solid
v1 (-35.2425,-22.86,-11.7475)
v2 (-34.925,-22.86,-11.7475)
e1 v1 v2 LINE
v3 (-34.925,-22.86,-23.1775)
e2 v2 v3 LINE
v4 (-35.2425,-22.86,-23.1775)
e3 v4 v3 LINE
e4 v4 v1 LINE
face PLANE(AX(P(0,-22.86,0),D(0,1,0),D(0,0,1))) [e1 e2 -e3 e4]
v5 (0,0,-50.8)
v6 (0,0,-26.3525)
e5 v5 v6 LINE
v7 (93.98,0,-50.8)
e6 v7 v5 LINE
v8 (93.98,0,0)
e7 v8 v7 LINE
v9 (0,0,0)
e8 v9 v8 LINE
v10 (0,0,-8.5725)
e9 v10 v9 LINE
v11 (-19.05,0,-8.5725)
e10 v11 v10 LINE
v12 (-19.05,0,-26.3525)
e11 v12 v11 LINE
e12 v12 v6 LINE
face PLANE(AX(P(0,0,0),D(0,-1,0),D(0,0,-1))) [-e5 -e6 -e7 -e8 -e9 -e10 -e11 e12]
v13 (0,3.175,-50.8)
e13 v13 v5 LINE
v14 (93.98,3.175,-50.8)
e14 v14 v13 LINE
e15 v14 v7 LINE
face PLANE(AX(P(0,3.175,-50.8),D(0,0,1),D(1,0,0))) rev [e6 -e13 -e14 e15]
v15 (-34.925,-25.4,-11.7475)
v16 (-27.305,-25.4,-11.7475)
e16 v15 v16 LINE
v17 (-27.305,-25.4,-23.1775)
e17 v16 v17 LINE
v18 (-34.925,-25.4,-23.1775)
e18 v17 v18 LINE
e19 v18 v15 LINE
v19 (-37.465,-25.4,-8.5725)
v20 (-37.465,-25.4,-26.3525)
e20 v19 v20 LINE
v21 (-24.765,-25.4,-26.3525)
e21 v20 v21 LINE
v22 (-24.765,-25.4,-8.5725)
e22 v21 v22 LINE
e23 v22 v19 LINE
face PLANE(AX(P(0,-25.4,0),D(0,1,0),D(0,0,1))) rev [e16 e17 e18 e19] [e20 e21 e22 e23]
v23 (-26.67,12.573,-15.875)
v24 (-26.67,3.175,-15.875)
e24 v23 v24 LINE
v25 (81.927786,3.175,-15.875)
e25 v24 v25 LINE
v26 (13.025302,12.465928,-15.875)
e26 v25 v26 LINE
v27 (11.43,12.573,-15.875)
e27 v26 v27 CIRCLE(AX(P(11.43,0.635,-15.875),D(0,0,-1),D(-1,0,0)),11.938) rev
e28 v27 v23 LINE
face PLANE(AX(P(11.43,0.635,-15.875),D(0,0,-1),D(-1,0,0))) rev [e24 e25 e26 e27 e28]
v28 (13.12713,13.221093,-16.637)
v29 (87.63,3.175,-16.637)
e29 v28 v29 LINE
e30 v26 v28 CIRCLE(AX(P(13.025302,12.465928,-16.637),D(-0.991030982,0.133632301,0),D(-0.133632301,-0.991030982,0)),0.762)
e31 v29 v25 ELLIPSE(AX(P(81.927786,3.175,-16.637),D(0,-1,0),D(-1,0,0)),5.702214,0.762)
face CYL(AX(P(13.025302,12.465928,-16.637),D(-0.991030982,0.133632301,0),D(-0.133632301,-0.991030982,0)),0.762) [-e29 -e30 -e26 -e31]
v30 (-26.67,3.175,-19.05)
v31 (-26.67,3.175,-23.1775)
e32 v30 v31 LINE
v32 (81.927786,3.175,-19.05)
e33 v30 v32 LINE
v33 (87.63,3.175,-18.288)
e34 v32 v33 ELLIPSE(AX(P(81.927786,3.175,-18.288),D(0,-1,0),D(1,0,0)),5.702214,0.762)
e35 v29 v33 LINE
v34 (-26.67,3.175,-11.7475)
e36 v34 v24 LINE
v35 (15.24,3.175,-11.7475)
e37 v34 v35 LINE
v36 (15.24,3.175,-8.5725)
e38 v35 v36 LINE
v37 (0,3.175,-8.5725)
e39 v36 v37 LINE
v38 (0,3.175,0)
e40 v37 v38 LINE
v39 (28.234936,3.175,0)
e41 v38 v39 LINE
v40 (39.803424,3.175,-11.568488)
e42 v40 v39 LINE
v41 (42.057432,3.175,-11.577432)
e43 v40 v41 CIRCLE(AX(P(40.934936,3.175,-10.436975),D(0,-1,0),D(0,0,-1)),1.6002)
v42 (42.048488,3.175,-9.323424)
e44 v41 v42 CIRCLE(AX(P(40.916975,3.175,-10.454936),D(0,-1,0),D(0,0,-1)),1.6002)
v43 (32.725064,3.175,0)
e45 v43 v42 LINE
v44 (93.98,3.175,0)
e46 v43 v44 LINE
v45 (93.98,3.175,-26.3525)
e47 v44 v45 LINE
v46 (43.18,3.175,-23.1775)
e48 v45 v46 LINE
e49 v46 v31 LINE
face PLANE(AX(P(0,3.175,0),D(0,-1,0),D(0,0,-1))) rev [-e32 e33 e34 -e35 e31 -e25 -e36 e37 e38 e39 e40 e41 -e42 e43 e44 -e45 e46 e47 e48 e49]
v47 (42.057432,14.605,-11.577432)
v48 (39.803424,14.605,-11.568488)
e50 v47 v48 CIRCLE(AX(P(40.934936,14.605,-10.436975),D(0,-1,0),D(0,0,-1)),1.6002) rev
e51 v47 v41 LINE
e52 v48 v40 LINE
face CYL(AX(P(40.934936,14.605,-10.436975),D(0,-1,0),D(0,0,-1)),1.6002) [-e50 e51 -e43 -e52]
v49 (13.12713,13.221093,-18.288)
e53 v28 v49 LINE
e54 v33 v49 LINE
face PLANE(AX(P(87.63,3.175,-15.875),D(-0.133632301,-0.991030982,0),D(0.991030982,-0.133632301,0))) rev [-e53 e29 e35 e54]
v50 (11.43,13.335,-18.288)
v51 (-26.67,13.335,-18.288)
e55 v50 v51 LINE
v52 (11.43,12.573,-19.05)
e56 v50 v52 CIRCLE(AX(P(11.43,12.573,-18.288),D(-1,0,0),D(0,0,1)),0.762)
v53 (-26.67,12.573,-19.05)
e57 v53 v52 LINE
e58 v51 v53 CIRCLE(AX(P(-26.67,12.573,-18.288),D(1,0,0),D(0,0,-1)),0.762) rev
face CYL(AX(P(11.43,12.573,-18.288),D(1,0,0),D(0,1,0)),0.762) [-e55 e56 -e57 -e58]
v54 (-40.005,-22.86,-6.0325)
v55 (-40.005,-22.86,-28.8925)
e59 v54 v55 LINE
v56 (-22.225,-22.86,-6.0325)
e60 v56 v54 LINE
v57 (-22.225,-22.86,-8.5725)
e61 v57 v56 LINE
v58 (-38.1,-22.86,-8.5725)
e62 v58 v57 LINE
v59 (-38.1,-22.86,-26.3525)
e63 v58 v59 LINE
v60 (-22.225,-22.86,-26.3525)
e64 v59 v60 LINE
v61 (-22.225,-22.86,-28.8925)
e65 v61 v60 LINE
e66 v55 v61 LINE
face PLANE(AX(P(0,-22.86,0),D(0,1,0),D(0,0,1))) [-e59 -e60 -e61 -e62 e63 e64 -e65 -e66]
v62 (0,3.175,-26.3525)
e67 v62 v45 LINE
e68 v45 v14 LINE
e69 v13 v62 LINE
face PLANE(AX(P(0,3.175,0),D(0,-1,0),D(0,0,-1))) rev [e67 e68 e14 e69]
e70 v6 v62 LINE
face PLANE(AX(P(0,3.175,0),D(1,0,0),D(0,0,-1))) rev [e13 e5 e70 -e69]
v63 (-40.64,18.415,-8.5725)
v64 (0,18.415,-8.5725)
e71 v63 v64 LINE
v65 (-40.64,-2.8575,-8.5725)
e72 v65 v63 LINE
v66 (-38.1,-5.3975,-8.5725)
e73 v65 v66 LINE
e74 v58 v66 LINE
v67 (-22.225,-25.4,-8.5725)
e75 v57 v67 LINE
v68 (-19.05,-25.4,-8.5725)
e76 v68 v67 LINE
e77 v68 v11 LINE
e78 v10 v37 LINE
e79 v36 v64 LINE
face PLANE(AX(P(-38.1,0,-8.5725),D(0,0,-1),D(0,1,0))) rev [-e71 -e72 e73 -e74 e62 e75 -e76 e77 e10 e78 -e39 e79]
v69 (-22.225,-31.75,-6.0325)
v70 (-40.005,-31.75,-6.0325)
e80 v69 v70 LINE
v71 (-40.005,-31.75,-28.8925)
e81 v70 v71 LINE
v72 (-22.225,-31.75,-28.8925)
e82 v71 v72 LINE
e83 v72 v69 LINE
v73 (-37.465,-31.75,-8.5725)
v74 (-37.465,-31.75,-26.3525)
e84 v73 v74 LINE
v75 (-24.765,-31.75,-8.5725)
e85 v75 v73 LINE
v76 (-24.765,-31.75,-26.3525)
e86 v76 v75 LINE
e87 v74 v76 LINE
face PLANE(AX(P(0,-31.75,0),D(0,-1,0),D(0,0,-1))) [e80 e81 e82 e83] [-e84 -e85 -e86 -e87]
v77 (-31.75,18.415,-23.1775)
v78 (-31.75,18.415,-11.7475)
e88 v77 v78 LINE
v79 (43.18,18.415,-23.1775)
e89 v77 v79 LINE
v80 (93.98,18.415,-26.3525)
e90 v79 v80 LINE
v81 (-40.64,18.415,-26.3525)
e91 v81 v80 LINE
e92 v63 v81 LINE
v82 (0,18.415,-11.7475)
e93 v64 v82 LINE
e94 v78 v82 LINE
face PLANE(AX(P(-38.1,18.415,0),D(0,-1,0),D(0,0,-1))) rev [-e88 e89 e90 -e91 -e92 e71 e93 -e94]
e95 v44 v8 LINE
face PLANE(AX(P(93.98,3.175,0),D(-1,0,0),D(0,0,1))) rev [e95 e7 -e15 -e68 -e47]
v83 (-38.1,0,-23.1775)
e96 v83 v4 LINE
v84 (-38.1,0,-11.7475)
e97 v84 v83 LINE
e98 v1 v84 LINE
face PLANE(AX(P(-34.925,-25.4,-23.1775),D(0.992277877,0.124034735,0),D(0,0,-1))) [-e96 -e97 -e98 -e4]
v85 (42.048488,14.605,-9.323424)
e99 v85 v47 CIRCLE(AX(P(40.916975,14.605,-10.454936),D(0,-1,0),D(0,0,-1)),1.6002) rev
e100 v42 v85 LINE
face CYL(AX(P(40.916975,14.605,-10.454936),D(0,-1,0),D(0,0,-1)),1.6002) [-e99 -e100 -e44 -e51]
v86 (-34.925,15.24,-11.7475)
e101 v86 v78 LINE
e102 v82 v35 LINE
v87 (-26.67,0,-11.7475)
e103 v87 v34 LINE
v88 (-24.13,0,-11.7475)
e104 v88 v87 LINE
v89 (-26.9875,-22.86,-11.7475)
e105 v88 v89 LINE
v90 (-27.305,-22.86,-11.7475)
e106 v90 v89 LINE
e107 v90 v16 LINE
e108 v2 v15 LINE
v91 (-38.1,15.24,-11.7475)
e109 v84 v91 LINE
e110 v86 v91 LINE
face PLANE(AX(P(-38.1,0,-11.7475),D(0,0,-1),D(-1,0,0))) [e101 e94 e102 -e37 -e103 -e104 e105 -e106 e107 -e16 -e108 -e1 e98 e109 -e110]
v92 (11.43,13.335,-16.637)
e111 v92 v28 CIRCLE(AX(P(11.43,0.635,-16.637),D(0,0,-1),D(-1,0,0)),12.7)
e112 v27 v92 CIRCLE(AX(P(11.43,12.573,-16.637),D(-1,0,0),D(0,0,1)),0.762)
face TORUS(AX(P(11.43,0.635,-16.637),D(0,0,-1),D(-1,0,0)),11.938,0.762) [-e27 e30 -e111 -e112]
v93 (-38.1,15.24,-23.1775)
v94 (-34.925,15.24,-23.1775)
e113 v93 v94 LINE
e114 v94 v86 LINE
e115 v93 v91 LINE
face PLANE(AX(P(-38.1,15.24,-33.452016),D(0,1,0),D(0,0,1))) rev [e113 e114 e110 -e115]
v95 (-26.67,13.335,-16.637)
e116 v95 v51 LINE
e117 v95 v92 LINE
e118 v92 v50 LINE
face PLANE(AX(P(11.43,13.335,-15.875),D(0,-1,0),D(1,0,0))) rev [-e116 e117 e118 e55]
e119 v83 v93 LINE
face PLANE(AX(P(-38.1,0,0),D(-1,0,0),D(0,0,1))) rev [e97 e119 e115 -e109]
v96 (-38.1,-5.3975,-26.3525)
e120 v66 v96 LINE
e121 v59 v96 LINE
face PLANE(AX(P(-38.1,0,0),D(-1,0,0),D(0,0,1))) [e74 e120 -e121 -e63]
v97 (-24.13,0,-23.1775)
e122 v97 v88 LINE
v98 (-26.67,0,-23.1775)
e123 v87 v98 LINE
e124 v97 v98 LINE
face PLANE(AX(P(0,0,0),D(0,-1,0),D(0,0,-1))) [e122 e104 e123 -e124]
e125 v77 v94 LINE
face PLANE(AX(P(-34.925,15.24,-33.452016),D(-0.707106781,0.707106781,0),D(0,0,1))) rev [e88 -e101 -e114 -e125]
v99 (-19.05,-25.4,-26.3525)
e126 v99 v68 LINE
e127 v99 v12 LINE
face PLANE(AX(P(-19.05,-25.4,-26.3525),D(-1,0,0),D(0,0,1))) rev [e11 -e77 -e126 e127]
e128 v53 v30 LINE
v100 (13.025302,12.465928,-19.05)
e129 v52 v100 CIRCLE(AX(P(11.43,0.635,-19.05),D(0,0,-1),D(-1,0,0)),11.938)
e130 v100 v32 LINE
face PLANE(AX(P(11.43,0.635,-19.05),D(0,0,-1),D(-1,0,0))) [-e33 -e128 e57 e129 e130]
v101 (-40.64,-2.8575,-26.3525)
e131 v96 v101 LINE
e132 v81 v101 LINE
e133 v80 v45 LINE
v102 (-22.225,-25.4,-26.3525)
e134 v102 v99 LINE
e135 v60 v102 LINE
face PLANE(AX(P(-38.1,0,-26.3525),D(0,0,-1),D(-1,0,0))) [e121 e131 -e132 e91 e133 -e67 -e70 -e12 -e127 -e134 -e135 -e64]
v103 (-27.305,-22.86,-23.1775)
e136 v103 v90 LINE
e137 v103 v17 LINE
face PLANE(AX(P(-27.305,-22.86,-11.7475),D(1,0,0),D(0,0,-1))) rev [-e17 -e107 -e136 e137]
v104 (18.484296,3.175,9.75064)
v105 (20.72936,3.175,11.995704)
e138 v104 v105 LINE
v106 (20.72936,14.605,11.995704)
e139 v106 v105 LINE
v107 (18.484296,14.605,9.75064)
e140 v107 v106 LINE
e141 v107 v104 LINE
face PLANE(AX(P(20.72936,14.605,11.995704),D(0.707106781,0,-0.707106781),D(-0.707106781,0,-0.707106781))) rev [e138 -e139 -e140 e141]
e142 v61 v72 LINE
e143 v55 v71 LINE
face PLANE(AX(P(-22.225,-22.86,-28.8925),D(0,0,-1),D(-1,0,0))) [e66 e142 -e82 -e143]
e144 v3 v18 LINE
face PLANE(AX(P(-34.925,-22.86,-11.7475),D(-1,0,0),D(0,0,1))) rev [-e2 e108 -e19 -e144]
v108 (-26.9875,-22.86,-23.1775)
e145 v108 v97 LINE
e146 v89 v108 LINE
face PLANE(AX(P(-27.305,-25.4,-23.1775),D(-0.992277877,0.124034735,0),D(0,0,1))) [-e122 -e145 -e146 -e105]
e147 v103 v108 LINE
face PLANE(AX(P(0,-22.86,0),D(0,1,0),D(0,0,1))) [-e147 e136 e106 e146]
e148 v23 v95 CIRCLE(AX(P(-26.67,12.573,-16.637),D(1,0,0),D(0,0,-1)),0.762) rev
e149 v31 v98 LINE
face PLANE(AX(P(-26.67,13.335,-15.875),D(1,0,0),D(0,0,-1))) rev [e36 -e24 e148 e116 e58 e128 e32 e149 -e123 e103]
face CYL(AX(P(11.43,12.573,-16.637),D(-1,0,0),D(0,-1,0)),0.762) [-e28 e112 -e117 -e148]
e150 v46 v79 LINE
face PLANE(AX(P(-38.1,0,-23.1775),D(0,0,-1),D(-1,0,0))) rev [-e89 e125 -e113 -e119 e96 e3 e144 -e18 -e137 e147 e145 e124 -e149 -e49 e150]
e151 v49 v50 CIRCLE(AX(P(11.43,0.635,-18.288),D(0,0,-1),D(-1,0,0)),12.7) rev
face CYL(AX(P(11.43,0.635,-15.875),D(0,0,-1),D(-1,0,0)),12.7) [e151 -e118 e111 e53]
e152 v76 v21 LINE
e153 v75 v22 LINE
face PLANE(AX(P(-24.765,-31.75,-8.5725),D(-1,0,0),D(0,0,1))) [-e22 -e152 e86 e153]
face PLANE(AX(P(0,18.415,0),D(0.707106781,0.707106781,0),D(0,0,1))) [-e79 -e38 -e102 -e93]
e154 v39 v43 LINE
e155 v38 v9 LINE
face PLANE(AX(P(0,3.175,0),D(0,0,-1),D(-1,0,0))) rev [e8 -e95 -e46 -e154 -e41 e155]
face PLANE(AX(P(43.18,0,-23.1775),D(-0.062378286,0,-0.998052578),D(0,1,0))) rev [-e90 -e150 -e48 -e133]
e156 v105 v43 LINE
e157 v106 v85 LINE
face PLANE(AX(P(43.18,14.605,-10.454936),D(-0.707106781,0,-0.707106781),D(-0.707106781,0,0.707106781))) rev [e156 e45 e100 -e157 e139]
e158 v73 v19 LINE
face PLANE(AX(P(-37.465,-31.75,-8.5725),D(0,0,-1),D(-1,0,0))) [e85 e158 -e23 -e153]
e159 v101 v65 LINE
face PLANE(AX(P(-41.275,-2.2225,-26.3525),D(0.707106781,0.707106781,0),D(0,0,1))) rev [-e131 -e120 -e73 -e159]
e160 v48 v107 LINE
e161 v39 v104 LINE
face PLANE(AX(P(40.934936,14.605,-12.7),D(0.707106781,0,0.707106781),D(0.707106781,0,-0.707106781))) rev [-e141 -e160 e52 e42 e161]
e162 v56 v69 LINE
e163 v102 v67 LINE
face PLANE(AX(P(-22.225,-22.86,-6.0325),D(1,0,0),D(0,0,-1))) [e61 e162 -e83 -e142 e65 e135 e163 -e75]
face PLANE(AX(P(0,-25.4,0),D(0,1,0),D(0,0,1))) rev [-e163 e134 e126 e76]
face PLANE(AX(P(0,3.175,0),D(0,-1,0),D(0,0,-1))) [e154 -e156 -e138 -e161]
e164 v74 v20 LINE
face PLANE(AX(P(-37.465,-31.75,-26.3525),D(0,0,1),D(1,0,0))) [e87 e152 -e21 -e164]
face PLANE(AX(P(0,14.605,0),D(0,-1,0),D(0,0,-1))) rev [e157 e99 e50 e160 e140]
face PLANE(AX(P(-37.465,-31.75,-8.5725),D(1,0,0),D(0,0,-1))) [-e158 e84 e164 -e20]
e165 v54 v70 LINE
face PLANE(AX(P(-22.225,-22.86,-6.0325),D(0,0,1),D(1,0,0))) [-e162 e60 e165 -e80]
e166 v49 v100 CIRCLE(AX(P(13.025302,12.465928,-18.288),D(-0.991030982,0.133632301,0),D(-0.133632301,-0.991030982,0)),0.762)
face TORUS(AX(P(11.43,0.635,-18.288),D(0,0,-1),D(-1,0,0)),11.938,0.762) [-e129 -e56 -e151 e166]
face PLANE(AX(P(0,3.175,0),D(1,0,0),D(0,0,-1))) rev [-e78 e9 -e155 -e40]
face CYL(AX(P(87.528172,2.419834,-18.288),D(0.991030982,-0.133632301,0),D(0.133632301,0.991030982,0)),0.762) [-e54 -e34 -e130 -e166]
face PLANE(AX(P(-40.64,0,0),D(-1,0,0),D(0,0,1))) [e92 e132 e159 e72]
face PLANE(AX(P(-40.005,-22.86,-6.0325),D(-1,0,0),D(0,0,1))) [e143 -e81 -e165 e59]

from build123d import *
from OCP.BRepFilletAPI import BRepFilletAPI_MakeChamfer

# Parameters (mm, degrees)
SKETCH1_W            = 93.98
SKETCH1_H            = 50.8
BOSS_EXTRUDE1_DEPTH  = 3.175
BOSS_EXTRUDE2_DEPTH  = 3.175
FILLET1_R            = 0.762
BOSS_EXTRUDE3_DEPTH  = 11.43
FILLET2_R            = 1.6002
SKETCH4_W            = 3.175
SKETCH4_H            = 15.24
SKETCH4_H_2          = 3.175
BOSS_EXTRUDE4_DEPTH  = 38.1
CHAMFER1_SIZE        = 15.24
SKETCH8_W            = 19.05
SKETCH8_H            = 17.78
BOSS_EXTRUDE5_DEPTH  = 25.4
SKETCH9_W            = 7.62
SKETCH9_H            = 11.43
CUT_EXTRUDE3_DEPTH   = 110.809108912
CHAMFER2_SIZE        = 3.175
CHAMFER2_SIZE_2      = 25.4
SKETCH14_W           = 17.78
SKETCH14_H           = 22.86
SKETCH14_W_2         = 7.62
SKETCH14_H_2         = 11.43
BOSS_EXTRUDE11_DEPTH = 2.54
SKETCH10_W           = 17.78
SKETCH10_H           = 22.86
SKETCH10_W_2         = 12.7
SKETCH10_H_2         = 17.78
BOSS_EXTRUDE12_DEPTH = 6.35
SKETCH11_W           = 6.35
SKETCH11_H           = 3.175
BOSS_EXTRUDE7_DEPTH  = 14.605
CHAMFER3_SIZE        = 3.175
SKETCH13_W           = 17.78
SKETCH13_H           = 20.6375
BOSS_EXTRUDE8_DEPTH  = 2.54
CHAMFER4_SIZE        = 3.175
SKETCH15_W           = 93.98
SKETCH15_H           = 15.24
BOSS_EXTRUDE13_DEPTH = 3.175
CHAMFER5_SIZE        = 3.175
CHAMFER5_SIZE_2      = 50.8
SKETCH17_W           = 26.67
SKETCH17_H           = 14.605
BOSS_EXTRUDE14_DEPTH = 3.175


# Some blends are built 0.0001 mm under size
with BuildPart() as part:
    # Sketch1 → Boss-Extrude1 (new body)
    with BuildSketch(Plane(origin=(0, 0, 0), x_dir=(1, 0, 0), z_dir=(0, 1, 0))):
        with Locations((46.99, 25.4)):
            Rectangle(SKETCH1_W, SKETCH1_H)
    extrude(amount=BOSS_EXTRUDE1_DEPTH)

    # Sketch2 → Boss-Extrude2 (add)
    with BuildSketch(Plane.XY.offset(-19.05)):
        with BuildLine():
            Line((87.63, 3.175), (13.127130217, 13.221093478))
            ThreePointArc((13.127130217, 13.221093478), (12.280474231, 13.306491372), (11.43, 13.335))
            Line((11.43, 13.335), (-26.67, 13.335))
            Line((-26.67, 13.335), (-26.67, 3.175))
            Line((-26.67, 3.175), (87.63, 3.175))
        make_face()
    extrude(amount=BOSS_EXTRUDE2_DEPTH)

    # Fillet1
    fillet1_edges = [part.edges().sort_by_distance(p)[0] for p in [
        (50.378565109, 8.198046739, -19.05),
        (12.280474231, 13.306491372, -19.05),
        (-7.62, 13.335, -19.05),
        (50.378565109, 8.198046739, -15.875),
        (12.280474231, 13.306491372, -15.875),
        (-7.62, 13.335, -15.875),
    ]]
    fillet(fillet1_edges, radius=FILLET1_R)

    # Sketch3 → Boss-Extrude3 (add)
    with BuildSketch(Plane(origin=(0, 3.175, 0), x_dir=(1, 0, 0), z_dir=(0, 1, 0))):
        Polygon((43.18, 10.45493597), (40.93493597, 12.7), (18.484295667, -9.750640303), (20.729359697, -11.995704333), align=None)
    extrude(amount=BOSS_EXTRUDE3_DEPTH)

    # Fillet2
    # the kernel refuses this fillet: 1.6002 mm, written as the material it takes off along each edge
    with BuildSketch(Plane(origin=(40.93493597, 3.175, -12.7), x_dir=(0.7071067811865515, 0, 0.7071067811865437), z_dir=(0, 1, 0)), Plane(origin=(43.18, 3.175, -10.45493597), x_dir=(-0.7071067811865437, 0, 0.7071067811865515), z_dir=(0, 1, 0))) as fillet2_piece_1:
        with BuildLine():
            CenterArc((FILLET2_R, -FILLET2_R), FILLET2_R, 90, 90)
            Line((0, -FILLET2_R), (0, 0))
            Line((0, 0), (FILLET2_R, 0))
        make_face()
    extrude(amount=15.4305, mode=Mode.SUBTRACT)

    # Sketch4 → Boss-Extrude4 (add)
    with BuildSketch(Plane.ZY):
        with Locations((-24.765, 10.795)):
            Rectangle(SKETCH4_W, SKETCH4_H)
        with Locations((-10.16, 10.795)):
            Rectangle(SKETCH4_W, SKETCH4_H)
        with Locations((-10.16, 1.5875)):
            Rectangle(SKETCH4_W, SKETCH4_H_2)
        with Locations((-24.765, 1.5875)):
            Rectangle(SKETCH4_W, SKETCH4_H_2)
    extrude(amount=BOSS_EXTRUDE4_DEPTH)

    # Chamfer1
    chamfer1_edges = [part.edges().sort_by_distance(p)[0] for p in [
        (0, 3.175, -10.16),
        (0, 3.175, -24.765),
    ]]
    chamfer(chamfer1_edges, length=CHAMFER1_SIZE - 0.0001)  # a hair under: the kernel refuses the full size

    # Sketch8 → Boss-Extrude5 (add)
    with BuildSketch(Plane.XZ):
        with Locations((-28.575, -17.4625)):
            Rectangle(SKETCH8_W, SKETCH8_H)
    extrude(amount=BOSS_EXTRUDE5_DEPTH)

    # Sketch9 → Cut-Extrude3 (cut, through all)
    with BuildSketch(Plane(origin=(0, 0, 0), x_dir=(1, 0, 0), z_dir=(0, 1, 0))):
        with Locations((-31.115, 17.4625)):
            Rectangle(SKETCH9_W, SKETCH9_H)
    extrude(amount=-CUT_EXTRUDE3_DEPTH, mode=Mode.SUBTRACT)

    # Chamfer2
    chamfer2_edges_1 = [part.edges().sort_by_distance(p)[0] for p in [
        (-27.305, 0, -17.4625),
    ]]
    chamfer2_side_1 = [part.faces().sort_by_distance(p)[0] for p in [
        (-27.2415, 0, -17.4625),
    ]]
    chamfer2_edges_2 = [part.edges().sort_by_distance(p)[0] for p in [
        (-34.925, 0, -17.4625),
    ]]
    chamfer2_side_2 = [part.faces().sort_by_distance(p)[0] for p in [
        (-34.9885, 0, -17.4625),
    ]]
    chamfer2 = BRepFilletAPI_MakeChamfer(part.part.solid().wrapped)
    for e in chamfer2_edges_1:
        chamfer2.Add(CHAMFER2_SIZE - 0.0001, CHAMFER2_SIZE_2 - 0.0001, e.wrapped, chamfer2_side_1[0].wrapped)
    for e in chamfer2_edges_2:
        chamfer2.Add(CHAMFER2_SIZE - 0.0001, CHAMFER2_SIZE_2 - 0.0001, e.wrapped, chamfer2_side_2[0].wrapped)
    add(Compound.cast(chamfer2.Shape()), mode=Mode.REPLACE)  # a hair under: the kernel refuses the full size

    # Sketch14 → Boss-Extrude11 (add)
    with BuildSketch(Plane.XZ.offset(25.4)):
        with Locations((-31.115, -17.4625)):
            Rectangle(SKETCH14_W, SKETCH14_H)
        with Locations((-31.115, -17.4625)):
            Rectangle(SKETCH14_W_2, SKETCH14_H_2, mode=Mode.SUBTRACT)
    extrude(amount=-BOSS_EXTRUDE11_DEPTH)

    # Sketch10 → Boss-Extrude12 (add)
    with BuildSketch(Plane.XZ.offset(25.4)):
        with Locations((-31.115, -17.4625)):
            Rectangle(SKETCH10_W, SKETCH10_H)
        with Locations((-31.115, -17.4625)):
            Rectangle(SKETCH10_W_2, SKETCH10_H_2, mode=Mode.SUBTRACT)
    extrude(amount=BOSS_EXTRUDE12_DEPTH)

    # Sketch11 → Boss-Extrude7 (add)
    with BuildSketch(Plane(origin=(0, 0, -11.7475), x_dir=(-1, 0, 0), z_dir=(0, 0, -1))):
        with Locations((34.925, 16.8275)):
            Rectangle(SKETCH11_W, SKETCH11_H)
    extrude(amount=BOSS_EXTRUDE7_DEPTH)

    # Chamfer3
    chamfer3_edges = [part.edges().sort_by_distance(p)[0] for p in [
        (-31.75, 15.24, -17.4625),
    ]]
    chamfer(chamfer3_edges, length=CHAMFER3_SIZE - 0.0001)  # a hair under: the kernel refuses the full size

    # Sketch13 → Boss-Extrude8 (add)
    with BuildSketch(Plane.ZY.offset(38.1)):
        with Locations((-17.4625, 8.09625)):
            Rectangle(SKETCH13_W, SKETCH13_H)
    extrude(amount=BOSS_EXTRUDE8_DEPTH)

    # Chamfer4
    # the kernel refuses this chamfer: 3.175 mm, written as the material it adds along each edge
    with BuildSketch(Plane(origin=(-38.1, -2.2225, -8.5725), x_dir=(0.02749587661058565, -0.9996219169112968, 0), z_dir=(0, 0, -1))) as chamfer4_piece_1_section:
        Polygon((CHAMFER4_SIZE * 0.999621916911, CHAMFER4_SIZE * 0.0274958766106), (-CHAMFER4_SIZE * 0.0274958766106, CHAMFER4_SIZE * 0.999621916911), (0, 0), align=None)
    chamfer4_piece_1 = extrude(amount=17.78, mode=Mode.PRIVATE)
    chamfer4_piece_1 = split(chamfer4_piece_1, bisect_by=Plane(origin=(-40.64, -3.320155959, -17.4625), z_dir=(1, 0, 0)), keep=Keep.TOP, mode=Mode.PRIVATE)
    add(chamfer4_piece_1)

    # Sketch15 → Boss-Extrude13 (add)
    with BuildSketch(Plane(origin=(0, 0, -26.3525), x_dir=(-1, 0, 0), z_dir=(0, 0, -1))):
        with Locations((-46.99, 10.795)):
            Rectangle(SKETCH15_W, SKETCH15_H)
    extrude(amount=-BOSS_EXTRUDE13_DEPTH)

    # Chamfer5
    # the kernel refuses this chamfer: 50.8, 3.175 mm, written as the material it takes off along each edge
    with BuildSketch(Plane(origin=(93.98, 150.485487252, -23.1775), x_dir=(0.5233850041899423, 0, -0.8520963193143684), z_dir=(0, -1, 0))) as chamfer5_piece_1:
        Polygon((CHAMFER5_SIZE * 0.852096319314, -CHAMFER5_SIZE * 0.52338500419), (-CHAMFER5_SIZE_2 * 0.52338500419, -CHAMFER5_SIZE_2 * 0.852096319314), (0, 0), align=None)
    extrude(amount=147.310487252, mode=Mode.SUBTRACT)

    # Sketch17 → Boss-Extrude14 (add)
    with BuildSketch(Plane.XZ.offset(-3.175)):
        with Locations((-13.335, -19.05)):
            Rectangle(SKETCH17_W, SKETCH17_H)
    extrude(amount=BOSS_EXTRUDE14_DEPTH)


solid = part.part
